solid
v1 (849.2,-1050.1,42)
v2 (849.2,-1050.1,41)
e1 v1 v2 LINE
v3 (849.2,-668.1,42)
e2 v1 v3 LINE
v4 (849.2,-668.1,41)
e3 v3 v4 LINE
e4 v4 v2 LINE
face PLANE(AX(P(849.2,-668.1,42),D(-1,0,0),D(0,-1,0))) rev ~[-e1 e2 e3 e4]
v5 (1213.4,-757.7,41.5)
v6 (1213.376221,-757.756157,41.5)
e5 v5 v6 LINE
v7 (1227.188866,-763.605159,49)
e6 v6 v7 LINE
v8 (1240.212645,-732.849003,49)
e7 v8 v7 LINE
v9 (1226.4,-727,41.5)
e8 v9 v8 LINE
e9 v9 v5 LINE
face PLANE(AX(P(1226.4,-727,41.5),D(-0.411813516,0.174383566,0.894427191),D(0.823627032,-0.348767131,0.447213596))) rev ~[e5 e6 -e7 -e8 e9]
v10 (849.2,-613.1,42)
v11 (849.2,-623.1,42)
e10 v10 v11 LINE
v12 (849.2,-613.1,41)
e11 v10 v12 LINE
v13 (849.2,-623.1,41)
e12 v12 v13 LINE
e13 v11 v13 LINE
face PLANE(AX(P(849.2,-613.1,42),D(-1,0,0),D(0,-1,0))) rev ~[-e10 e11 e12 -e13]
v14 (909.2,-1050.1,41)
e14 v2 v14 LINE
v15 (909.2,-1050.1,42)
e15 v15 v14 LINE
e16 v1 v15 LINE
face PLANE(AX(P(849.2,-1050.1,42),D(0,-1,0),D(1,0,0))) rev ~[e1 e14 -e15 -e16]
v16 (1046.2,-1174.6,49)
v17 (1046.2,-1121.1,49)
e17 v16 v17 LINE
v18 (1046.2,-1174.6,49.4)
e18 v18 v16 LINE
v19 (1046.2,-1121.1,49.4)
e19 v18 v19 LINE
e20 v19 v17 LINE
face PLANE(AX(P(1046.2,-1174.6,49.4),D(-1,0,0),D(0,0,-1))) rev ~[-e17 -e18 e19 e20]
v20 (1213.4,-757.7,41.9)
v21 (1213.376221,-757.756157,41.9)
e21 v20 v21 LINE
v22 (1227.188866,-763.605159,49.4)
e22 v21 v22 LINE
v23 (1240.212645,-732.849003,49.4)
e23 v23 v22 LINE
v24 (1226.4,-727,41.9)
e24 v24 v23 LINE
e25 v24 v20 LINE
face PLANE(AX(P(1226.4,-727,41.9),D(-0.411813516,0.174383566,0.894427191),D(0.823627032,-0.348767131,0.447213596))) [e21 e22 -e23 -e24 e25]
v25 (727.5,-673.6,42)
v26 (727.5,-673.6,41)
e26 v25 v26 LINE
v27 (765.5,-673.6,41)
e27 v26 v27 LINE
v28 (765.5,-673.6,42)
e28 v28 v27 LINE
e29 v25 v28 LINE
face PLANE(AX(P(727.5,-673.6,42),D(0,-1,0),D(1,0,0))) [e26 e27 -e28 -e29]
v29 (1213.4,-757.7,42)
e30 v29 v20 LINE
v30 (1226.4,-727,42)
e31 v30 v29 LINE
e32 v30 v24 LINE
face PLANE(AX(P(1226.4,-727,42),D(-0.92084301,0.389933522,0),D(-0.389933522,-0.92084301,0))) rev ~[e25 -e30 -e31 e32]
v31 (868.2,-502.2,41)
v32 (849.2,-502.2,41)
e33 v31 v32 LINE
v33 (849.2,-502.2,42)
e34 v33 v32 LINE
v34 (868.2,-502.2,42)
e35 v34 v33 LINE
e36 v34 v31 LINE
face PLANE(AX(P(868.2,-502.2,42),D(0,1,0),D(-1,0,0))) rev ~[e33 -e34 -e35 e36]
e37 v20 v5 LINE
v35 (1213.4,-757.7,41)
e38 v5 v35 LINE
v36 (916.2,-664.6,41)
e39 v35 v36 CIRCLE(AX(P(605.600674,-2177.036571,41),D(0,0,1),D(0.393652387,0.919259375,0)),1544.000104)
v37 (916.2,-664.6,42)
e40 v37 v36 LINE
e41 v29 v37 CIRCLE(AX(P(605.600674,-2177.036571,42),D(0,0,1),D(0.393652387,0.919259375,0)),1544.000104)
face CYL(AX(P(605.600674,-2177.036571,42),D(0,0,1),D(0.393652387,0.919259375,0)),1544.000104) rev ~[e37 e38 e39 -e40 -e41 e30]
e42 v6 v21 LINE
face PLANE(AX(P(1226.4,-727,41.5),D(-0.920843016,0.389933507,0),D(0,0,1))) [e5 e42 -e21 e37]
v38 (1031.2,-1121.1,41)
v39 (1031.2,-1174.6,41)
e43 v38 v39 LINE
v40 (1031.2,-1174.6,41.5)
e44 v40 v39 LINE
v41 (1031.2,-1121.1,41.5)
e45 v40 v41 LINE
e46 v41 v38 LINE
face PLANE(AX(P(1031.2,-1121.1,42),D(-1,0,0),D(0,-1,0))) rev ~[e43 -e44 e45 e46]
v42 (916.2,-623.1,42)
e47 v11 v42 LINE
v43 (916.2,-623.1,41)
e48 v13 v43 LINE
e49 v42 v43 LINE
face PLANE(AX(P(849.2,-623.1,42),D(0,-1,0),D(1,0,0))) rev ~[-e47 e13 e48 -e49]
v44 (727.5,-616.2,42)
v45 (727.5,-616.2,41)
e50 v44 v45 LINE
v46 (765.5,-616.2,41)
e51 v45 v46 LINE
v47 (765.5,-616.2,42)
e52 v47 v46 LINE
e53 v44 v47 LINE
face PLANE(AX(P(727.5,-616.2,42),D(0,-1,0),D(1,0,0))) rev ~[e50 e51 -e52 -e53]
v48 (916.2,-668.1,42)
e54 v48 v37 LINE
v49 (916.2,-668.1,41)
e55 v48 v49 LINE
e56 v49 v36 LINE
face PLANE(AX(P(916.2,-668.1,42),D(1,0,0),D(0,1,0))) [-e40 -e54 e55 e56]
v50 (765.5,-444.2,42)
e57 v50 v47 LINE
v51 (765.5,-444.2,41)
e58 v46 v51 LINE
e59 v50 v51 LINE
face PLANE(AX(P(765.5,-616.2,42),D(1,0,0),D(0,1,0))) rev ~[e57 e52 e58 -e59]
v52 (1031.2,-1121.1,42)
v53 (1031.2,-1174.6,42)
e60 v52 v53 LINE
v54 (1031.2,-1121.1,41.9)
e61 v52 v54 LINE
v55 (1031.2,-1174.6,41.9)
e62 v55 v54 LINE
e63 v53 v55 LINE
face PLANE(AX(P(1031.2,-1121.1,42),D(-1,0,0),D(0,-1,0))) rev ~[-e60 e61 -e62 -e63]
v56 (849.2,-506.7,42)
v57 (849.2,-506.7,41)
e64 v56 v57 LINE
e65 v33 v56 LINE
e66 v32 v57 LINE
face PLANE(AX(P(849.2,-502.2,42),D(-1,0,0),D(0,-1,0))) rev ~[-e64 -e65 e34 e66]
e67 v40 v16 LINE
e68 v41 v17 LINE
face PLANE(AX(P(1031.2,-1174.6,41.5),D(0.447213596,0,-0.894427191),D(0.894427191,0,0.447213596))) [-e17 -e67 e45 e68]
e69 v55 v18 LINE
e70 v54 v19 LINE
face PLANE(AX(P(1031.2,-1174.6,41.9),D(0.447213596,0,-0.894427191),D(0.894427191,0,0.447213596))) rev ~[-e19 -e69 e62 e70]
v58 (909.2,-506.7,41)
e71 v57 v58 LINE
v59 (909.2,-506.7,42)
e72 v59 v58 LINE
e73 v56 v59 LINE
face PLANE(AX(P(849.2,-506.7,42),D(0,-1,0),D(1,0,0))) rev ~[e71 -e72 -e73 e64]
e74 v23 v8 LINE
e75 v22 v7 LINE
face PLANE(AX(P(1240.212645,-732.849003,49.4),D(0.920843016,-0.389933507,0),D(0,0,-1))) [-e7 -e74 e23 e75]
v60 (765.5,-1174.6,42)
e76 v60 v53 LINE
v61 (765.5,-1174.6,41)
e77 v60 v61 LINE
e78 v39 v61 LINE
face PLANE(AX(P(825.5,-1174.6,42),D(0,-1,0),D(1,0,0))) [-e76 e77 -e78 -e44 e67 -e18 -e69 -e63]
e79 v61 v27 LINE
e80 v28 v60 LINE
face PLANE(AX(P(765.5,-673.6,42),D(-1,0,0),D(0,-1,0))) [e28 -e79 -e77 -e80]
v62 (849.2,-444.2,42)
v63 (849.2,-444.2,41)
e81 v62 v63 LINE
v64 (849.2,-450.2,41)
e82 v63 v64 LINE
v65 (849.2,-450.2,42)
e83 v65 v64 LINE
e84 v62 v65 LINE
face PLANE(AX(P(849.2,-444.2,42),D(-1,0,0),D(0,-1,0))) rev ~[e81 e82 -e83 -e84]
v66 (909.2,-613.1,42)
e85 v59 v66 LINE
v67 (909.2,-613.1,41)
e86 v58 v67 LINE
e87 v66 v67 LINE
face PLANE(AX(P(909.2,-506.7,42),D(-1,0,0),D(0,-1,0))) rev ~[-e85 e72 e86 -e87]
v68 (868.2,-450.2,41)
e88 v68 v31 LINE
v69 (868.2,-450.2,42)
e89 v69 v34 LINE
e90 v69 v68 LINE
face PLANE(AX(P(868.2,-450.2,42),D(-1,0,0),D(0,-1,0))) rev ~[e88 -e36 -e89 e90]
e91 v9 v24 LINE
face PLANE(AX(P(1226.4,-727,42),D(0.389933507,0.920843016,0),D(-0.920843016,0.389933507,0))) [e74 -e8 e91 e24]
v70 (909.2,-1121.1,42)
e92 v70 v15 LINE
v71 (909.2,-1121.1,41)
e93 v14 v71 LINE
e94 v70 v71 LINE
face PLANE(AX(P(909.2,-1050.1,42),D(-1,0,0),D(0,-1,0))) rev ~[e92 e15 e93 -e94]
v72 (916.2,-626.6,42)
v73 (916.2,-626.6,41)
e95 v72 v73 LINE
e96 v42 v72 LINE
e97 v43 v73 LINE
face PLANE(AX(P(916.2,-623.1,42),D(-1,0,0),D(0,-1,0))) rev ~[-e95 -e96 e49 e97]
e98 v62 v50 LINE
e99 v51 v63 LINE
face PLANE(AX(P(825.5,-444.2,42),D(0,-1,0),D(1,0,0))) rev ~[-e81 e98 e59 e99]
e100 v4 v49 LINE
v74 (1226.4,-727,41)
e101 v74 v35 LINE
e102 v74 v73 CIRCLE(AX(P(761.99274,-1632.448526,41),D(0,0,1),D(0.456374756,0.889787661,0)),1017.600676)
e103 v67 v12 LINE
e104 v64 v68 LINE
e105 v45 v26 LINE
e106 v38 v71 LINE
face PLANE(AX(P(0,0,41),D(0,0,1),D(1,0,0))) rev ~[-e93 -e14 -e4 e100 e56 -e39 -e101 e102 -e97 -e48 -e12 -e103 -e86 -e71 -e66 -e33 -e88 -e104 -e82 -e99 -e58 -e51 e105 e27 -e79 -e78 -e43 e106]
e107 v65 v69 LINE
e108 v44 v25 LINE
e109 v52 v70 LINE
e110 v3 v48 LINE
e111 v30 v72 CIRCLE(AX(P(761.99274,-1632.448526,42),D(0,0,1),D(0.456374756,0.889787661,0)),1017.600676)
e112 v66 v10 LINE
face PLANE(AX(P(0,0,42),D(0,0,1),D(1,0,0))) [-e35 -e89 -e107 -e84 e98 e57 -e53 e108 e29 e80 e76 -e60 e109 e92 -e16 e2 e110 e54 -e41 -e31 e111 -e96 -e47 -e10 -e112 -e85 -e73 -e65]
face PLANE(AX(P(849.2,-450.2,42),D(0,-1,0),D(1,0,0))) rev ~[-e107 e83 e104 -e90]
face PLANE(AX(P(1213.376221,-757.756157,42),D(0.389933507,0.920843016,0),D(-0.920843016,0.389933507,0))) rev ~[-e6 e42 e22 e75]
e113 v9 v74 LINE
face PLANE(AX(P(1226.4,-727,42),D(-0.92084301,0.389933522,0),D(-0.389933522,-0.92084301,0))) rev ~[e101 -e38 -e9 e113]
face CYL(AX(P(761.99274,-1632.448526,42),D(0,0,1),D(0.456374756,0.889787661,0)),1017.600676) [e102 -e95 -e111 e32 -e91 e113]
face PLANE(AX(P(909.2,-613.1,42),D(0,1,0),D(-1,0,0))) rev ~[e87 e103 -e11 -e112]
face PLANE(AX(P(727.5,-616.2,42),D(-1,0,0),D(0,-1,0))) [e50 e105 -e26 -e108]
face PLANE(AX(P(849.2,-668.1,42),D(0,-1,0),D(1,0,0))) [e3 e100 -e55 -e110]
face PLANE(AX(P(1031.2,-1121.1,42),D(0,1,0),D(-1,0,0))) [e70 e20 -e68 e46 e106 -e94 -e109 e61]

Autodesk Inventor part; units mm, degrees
ref_plane "YZ Plane" through (0, 0, 0) normal (1, 0, 0) x (0, 1, 0)
ref_plane "工作平面1" through (0, 0, 42) normal (0, 0, 1) x (1, 0, 0)
sketch "草图1" plane through (0, 0, 42) normal (0, 0, 1) x (1, 0, 0)
  line L0 (0, 0) -> (60, 0)
  line L1 (60, 0) -> (60, -1169.8)
  line L2 (60, -1169.8) -> (0, -1169.8)
  line L3 (0, -1169.8) -> (0, 0)
  line L4 (0, -80.6) -> (60, -80.6)
  line L5 (0, -191.9) -> (60, -191.9)
  line L6 (0, -276.5) -> (60, -276.5)
  line L7 (0, -335.9) -> (60, -335.9)
  line L8 (0, -420.6) -> (60, -420.6)
  line L9 (0, -550.6) -> (60, -550.6)
  line L10 (0, -677.8) -> (60, -677.8)
  line L11 (0, -782.9) -> (60, -782.9)
  line L12 (0, -839.5) -> (60, -839.5)
  line L13 (0, -923.6) -> (60, -923.6)
  line L14 (0, -1007.7) -> (60, -1007.7)
  line L15 (0, -1091.2) -> (60, -1091.2)
  line L16 (60, 0) -> (118.4, 0)
  line L17 (118.4, 0) -> (118.4, -23.7)
  line L18 (118.4, -23.7) -> (83.4, -23.7)
  line L19 (83.4, -23.7) -> (83.4, -79.7)
  line L20 (83.4, -79.7) -> (118.4, -79.7)
  line L21 (118.4, -79.7) -> (118.4, -137.6)
  line L22 (118.4, -137.6) -> (83.4, -137.6)
  line L23 (83.4, -137.6) -> (83.4, -276.5)
  line L24 (83.4, -276.5) -> (142.9, -276.5)
  line L25 (142.9, -276.5) -> (142.9, -379.5)
  line L26 (83.4, -276.5) -> (83.4, -379.5)
  line L27 (83.4, -379.5) -> (142.9, -379.5)
  line L28 (142.9, -379.5) -> (142.9, -463)
  line L29 (142.9, -463) -> (83.4, -463)
  line L30 (83.4, -463) -> (83.4, -379.5)
  line L31 (142.9, -463) -> (142.9, -566.2)
  line L32 (142.9, -566.2) -> (83.4, -566.2)
  line L33 (83.4, -566.2) -> (83.4, -463)
  line L34 (142.9, -566.2) -> (146.7, -566.2)
  line L35 (146.7, -566.2) -> (146.7, -616.2)
  line L36 (146.7, -616.2) -> (192.5, -616.2)
  line L37 (192.5, -616.2) -> (192.5, -673.2)
  line L38 (192.5, -616.2) -> (342.5, -616.2)
  line L39 (342.5, -616.2) -> (342.5, -673.2)
  line L40 (342.5, -673.2) -> (143.4, -673.2)
  line L41 (143.4, -673.2) -> (83.4, -673.2)
  line L42 (83.4, -673.2) -> (83.4, -1092.3)
  line L43 (83.4, -1092.3) -> (143.4, -1092.3)
  line L44 (143.4, -1092.3) -> (143.4, -673.2)
  line L45 (83.4, -754.3) -> (143.4, -754.3)
  line L46 (143.4, -837.8) -> (83.4, -837.8)
  line L47 (83.4, -893.6) -> (143.4, -893.6)
  line L48 (143.4, -978.3) -> (83.4, -978.3)
  line L49 (60, -1169.8) -> (188.1, -1169.8)
  line L50 (188.1, -1169.8) -> (188.1, -1092.3)
  line L51 (188.1, -1092.3) -> (143.4, -1092.3)
  line L52 (83.4, -1092.3) -> (83.4, -1117.3)
  line L53 (83.4, -1117.3) -> (188.1, -1117.3)
  line L54 (98.6, -1092.3) -> (98.6, -1117.3)
  line L55 (114.5, -1092.3) -> (114.5, -1117.3)
  line L56 (143.4, -1092.3) -> (143.4, -1117.3)
  line L57 (166.2, -1092.3) -> (166.2, -1117.3)
  line L58 (188.1, -1163.6) -> (336, -1163.6)
  line L59 (188.1, -1137.1) -> (336, -1137.1)
  line L60 (336, -1137.1) -> (336, -1163.6)
  line L61 (342.5, -616.2) -> (398.5, -616.2)
  line L62 (342.5, -673.2) -> (393, -673.2)
  line L63 (393, -673.2) -> (393, -1136.7)
  line L64 (393, -1136.7) -> (393, -1141.7)
  line L65 (393, -1136.7) -> (336, -1137.1)
  line L66 (336, -1163.6) -> (393, -1163.6)
  line L67 (393, -1163.6) -> (393, -1158.6)
  line L68 (393, -1163.6) -> (393, -1188.1)
  line L69 (393, -1188.1) -> (417, -1188.1)
  line L70 (417, -1188.1) -> (542.5, -1188.1)
  line L71 (542.5, -1188.1) -> (542.5, -1127.7)
  line L72 (417, -1188.1) -> (417, -1127.7)
  line L73 (417, -1127.7) -> (542.5, -1127.7)
  line L74 (542.5, -1127.7) -> (542.5, -896.8)
  line L75 (542.5, -896.8) -> (542.5, -786.2)
  line L76 (542.5, -786.2) -> (542.5, -673.6)
  line L77 (542.5, -673.6) -> (393, -673.2)
  line L78 (417, -1127.7) -> (417, -896.8)
  line L79 (417, -896.8) -> (542.5, -896.8)
  line L80 (417, -896.8) -> (417.2959, -786.2)
  line L81 (417.2959, -786.2) -> (542.5, -786.2)
  line L82 (417.2959, -786.2) -> (417.5981, -673.2658)
  line L83 (398.5, -499.2) -> (398.5, -384.2)
  line L84 (398.5, -616.2) -> (398.5, -499.2)
  line L85 (398.5, -616.2) -> (458.5, -616.2)
  line L86 (458.5, -616.2) -> (458.5, -384.2)
  line L87 (458.5, -384.2) -> (398.5, -384.2)
  line L88 (398.5, -499.2) -> (458.5, -499.2)
  line L89 (398.5, -441.7) -> (458.5, -441.7)
  line L90 (458.5, -384.2) -> (458.5, -354.2)
  line L91 (458.5, -354.2) -> (482.5, -369.2)
  line L92 (482.5, -369.2) -> (482.5, -384.2)
  line L93 (482.5, -384.2) -> (542.5, -384.2)
  line L94 (542.5, -384.2) -> (542.5, -413.6)
  line L95 (542.5, -413.6) -> (542.5, -443.7)
  line L96 (542.5, -443.7) -> (542.5, -498.7)
  line L97 (542.5, -498.7) -> (542.5, -616.2)
  line L98 (542.5, -413.6) -> (501.5, -413.6)
  line L99 (542.5, -443.7) -> (482.5, -443.7)
  line L100 (542.5, -616.2) -> (482.5, -616.2)
  line L101 (542.5, -498.7) -> (482.5, -498.7)
  line L102 (482.5, -410.1) -> (501.5, -410.1)
  line L103 (501.5, -410.1) -> (501.5, -423.1)
  line L104 (501.5, -423.1) -> (482.5, -423.1)
  line L105 (482.5, -384.2) -> (482.5, -410.1)
  line L106 (482.5, -423.1) -> (482.5, -616.2)
  line L107 (542.5, -616.2) -> (727.5, -616.2)
  line L108 (727.5, -616.2) -> (727.5, -673.6)
  line L109 (727.5, -673.6) -> (542.5, -673.6)
  line L110 (578, -673.6) -> (578, -726.6)
  line L111 (578, -726.6) -> (605, -726.6)
  line L112 (605, -726.6) -> (605, -673.6)
  line L113 (727.5, -673.6) -> (727.5, -726.6)
  line L114 (727.5, -726.6) -> (700.5, -726.6)
  line L115 (700.5, -726.6) -> (700.5, -673.6)
  line L116 (442.5, -384.2) -> (442.5, -354.2)
  line L117 (442.5, -354.2) -> (458.5, -354.2)
  line L118 (398.5, -384.2) -> (384.5, -384.2)
  line L119 (384.5, -384.2) -> (384.5, -354.2)
  line L120 (384.5, -354.2) -> (400.5, -354.2)
  line L121 (400.5, -354.2) -> (400.5, -384.2)
  line L122 (727.5, -616.2) -> (765.5, -616.2)
  line L123 (765.5, -616.2) -> (825.5, -616.2)
  line L124 (765.5, -616.2) -> (765.5, -504.2)
  line L125 (765.5, -504.2) -> (765.5, -444.2)
  line L126 (765.5, -444.2) -> (825.5, -444.2)
  line L127 (825.5, -444.2) -> (825.5, -504.2)
  line L128 (825.5, -504.2) -> (825.5, -616.2)
  line L129 (825.5, -504.2) -> (765.5, -504.2)
  line L130 (825.5, -444.2) -> (849.2, -444.2)
  line L131 (849.2, -444.2) -> (849.2, -450.2)
  line L132 (849.2, -450.2) -> (868.2, -450.2)
  line L133 (868.2, -450.2) -> (868.2, -502.2)
  line L134 (868.2, -502.2) -> (849.2, -502.2)
  line L135 (849.2, -502.2) -> (849.2, -450.2)
  line L136 (849.2, -502.2) -> (849.2, -506.7)
  line L137 (849.2, -506.7) -> (909.2, -506.7)
  line L138 (909.2, -506.7) -> (909.2, -613.1)
  line L139 (909.2, -613.1) -> (849.2, -613.1)
  line L140 (849.2, -613.1) -> (849.2, -506.7)
  line L141 (727.5, -673.6) -> (765.5, -673.6)
  line L142 (765.5, -673.6) -> (765.5, -786.6)
  line L143 (765.5, -786.6) -> (825.5, -786.6)
  line L144 (825.5, -786.6) -> (825.5, -673.6)
  line L145 (825.5, -673.6) -> (765.5, -673.6)
  line L146 (765.5, -786.6) -> (765.5, -897.6)
  line L147 (765.5, -897.6) -> (825.5, -897.6)
  line L148 (825.5, -897.6) -> (825.5, -786.6)
  line L149 (765.5, -897.6) -> (765.5, -1008.6)
  line L150 (765.5, -1008.6) -> (825.5, -1008.6)
  line L151 (825.5, -1008.6) -> (825.5, -897.6)
  line L152 (765.5, -1008.6) -> (765.5, -1125.1)
  line L153 (765.5, -1125.1) -> (825.5, -1125.1)
  line L154 (825.5, -1125.1) -> (825.5, -1008.6)
  line L155 (765.5, -1125.1) -> (765.5, -1174.6)
  line L156 (765.5, -1174.6) -> (825.5, -1174.6)
  line L157 (825.5, -1174.6) -> (825.5, -1125.1)
  line L158 (825.5, -1174.6) -> (849.2, -1174.6)
  line L159 (849.2, -613.1) -> (849.2, -623.1)
  line L160 (849.2, -623.1) -> (916.2, -623.1)
  line L161 (916.2, -623.1) -> (916.2, -626.6)
  line L162 (849.2, -623.1) -> (849.2, -668.1)
  line L163 (849.2, -668.1) -> (916.2, -668.1)
  line L164 (916.2, -668.1) -> (916.2, -664.6)
  line L165 (849.2, -668.1) -> (849.2, -681.1)
  line L166 (849.2, -681.1) -> (849.2, -1050.1)
  line L167 (849.2, -1050.1) -> (909.2, -1050.1)
  line L168 (909.2, -1050.1) -> (909.2, -1091.6)
  line L169 (909.2, -1091.6) -> (909.2, -1121.1)
  line L170 (909.2, -1121.1) -> (849.2, -1121.1)
  line L171 (849.2, -1121.1) -> (849.2, -1050.1)
  line L172 (909.2, -1091.6) -> (849.2, -1091.6)
  line L173 (849.2, -1174.6) -> (849.2, -1121.1)
  line L174 (849.2, -1174.6) -> (1031.2, -1174.6)
  line L175 (1031.2, -1121.1) -> (909.2, -1121.1)
  line L176 (1031.2, -1121.1) -> (1031.2, -1174.6)
  line L177 (916.2, -626.6) -> (1226.4, -727) construction
  arc A0 (1226.4, -727) -> (916.2, -626.6) centre (761.993, -1632.4479) ccw
  line L178 (916.2, -664.6) -> (1213.4, -757.7) construction
  arc A1 (1213.4, -757.7) -> (916.2, -664.6) centre (605.6007, -2177.0365) ccw
  line L179 (1226.4, -727) -> (1213.4, -757.7)
  line L180 (1226.4, -727) -> (1239.7468, -733.8456)
  line L181 (1213.4, -757.7) -> (1226.7468, -764.5456)
  line L182 (1239.7468, -733.8456) -> (1237.0998, -739.0064)
  line L183 (1226.7468, -764.5456) -> (1229.3938, -759.3849)
  dimension "d1" = 60
  dimension "d2" = 80.6
  dimension "d3" = 111.3
  dimension "d4" = 84.6
  dimension "d5" = 59.4
  dimension "d6" = 84.7
  dimension "d7" = 130
  dimension "d8" = 127.2
  dimension "d9" = 105.1
  dimension "d10" = 56.6
  dimension "d11" = 84.1
  dimension "d12" = 84.1
  dimension "d13" = 83.5
  dimension "d14" = 78.6
  dimension "d15" = 58.4
  dimension "d16" = 23.7
  dimension "d17" = 35
  dimension "d18" = 56
  dimension "d19" = 57.9
  dimension "d20" = 35
  dimension "d21" = 138.9
  dimension "d22" = 59.5
  dimension "d23" = 103
  dimension "d24" = 83.5
  dimension "d25" = 103.2
  dimension "d26" = 59.5
  dimension "d27" = 3.8
  dimension "d28" = 50
  dimension "d29" = 45.8
  dimension "d30" = 57
  dimension "d31" = 150
  dimension "d32" = 57
  dimension "d33" = 199.1
  dimension "d34" = 60
  dimension "d36" = 81.1
  dimension "d37" = 83.5
  dimension "d38" = 55.8
  dimension "d39" = 84.7
  dimension "d40" = 114
  dimension "d41" = 128.1
  dimension "d42" = 25
  dimension "d43" = 15.2
  dimension "d44" = 15.9
  dimension "d45" = 28.9
  dimension "d46" = 22.8
  dimension "d47" = 21.9
  dimension "d48" = 147.9
  dimension "d49" = 6.2
  dimension "d50" = 26.5
  dimension "d51" = 56
  dimension "d52" = 50.5
  dimension "d53" = 463.5
  dimension "d54" = 5
  dimension "d55" = 5
  dimension "d56" = 24.5
  dimension "d57" = 24
  dimension "d58" = 125.5
  dimension "d59" = 60.4
  dimension "d60" = 230.9
  dimension "d61" = 110.6
  dimension "d62" = 112.6
  dimension "d64" = 117
  dimension "d65" = 115
  dimension "d66" = 60
extrude "拉伸1" add sketch "草图1" against normal blind 1 contours L108 L122 L123 L128 L127 L130 L131 L135 L136 L140 L159 L162 L165 L166 L171 L173 L158 L157 L154 L151 L148 L144 L145 L141 | L145 L144 L143 L142 | L124 L129 L128 L123 | L143 L148 L147 L146 | L125 L126 L127 L129 | L147 L151 L150 L149 | L150 L154 L153 L152 | L153 L157 L156 L155 | L132 L133 L134 L135 | L173 L170 L175 L176 L174 | L137 L138 L139 L140 | L171 L172 L169 L170 | L171 L167 L168 L172 | L160 L161 A0 L179 A1 L164 L163 L162
sketch "草图2" plane through (765.5, -1174.6, 42) normal (0, -1, 0) x (1, 0, 0)
  line L0 (265.7, 0) -> (265.7, -1) construction
  line L1 (265.7, -0.5) -> (280.7, 7)
  line L2 (265.7, -0.5) -> (265.7, -0.1)
  line L3 (265.7, -0.1) -> (280.7, 7.4)
  line L4 (280.7, 7.4) -> (280.7, 7)
  point P0 (-765.5, -42)
  dimension "d135" = 7.5
  dimension "d137" = 15
  dimension "d138" = 0.4
extrude "拉伸2" add sketch "草图2" against normal up to surface (53.5 mm away)
ref_plane "工作平面2" through (1226.4, -727, 42) normal (0.3899335, 0.920843, 0) x (-0.920843, 0.3899335, 0)
sketch "草图3" plane through (1226.4, -727, 42) normal (0.3899335, 0.920843, 0) x (-0.920843, 0.3899335, 0)
  line L0 (0, 0) -> (0, -1) construction
  line L1 (0, -0.5) -> (-15, 7)
  line L2 (0, -0.5) -> (0, -0.1)
  line L3 (0, -0.1) -> (-15, 7.4)
  line L4 (-15, 7.4) -> (-15, 7)
  point P0 (1412.8035, -42)
  dimension "d141" = 7.5
  dimension "d144" = 15
  dimension "d145" = 0.4
extrude "拉伸3" add sketch "草图3" against normal blind 33.4
properties part number "LabVIEWM0.5"
